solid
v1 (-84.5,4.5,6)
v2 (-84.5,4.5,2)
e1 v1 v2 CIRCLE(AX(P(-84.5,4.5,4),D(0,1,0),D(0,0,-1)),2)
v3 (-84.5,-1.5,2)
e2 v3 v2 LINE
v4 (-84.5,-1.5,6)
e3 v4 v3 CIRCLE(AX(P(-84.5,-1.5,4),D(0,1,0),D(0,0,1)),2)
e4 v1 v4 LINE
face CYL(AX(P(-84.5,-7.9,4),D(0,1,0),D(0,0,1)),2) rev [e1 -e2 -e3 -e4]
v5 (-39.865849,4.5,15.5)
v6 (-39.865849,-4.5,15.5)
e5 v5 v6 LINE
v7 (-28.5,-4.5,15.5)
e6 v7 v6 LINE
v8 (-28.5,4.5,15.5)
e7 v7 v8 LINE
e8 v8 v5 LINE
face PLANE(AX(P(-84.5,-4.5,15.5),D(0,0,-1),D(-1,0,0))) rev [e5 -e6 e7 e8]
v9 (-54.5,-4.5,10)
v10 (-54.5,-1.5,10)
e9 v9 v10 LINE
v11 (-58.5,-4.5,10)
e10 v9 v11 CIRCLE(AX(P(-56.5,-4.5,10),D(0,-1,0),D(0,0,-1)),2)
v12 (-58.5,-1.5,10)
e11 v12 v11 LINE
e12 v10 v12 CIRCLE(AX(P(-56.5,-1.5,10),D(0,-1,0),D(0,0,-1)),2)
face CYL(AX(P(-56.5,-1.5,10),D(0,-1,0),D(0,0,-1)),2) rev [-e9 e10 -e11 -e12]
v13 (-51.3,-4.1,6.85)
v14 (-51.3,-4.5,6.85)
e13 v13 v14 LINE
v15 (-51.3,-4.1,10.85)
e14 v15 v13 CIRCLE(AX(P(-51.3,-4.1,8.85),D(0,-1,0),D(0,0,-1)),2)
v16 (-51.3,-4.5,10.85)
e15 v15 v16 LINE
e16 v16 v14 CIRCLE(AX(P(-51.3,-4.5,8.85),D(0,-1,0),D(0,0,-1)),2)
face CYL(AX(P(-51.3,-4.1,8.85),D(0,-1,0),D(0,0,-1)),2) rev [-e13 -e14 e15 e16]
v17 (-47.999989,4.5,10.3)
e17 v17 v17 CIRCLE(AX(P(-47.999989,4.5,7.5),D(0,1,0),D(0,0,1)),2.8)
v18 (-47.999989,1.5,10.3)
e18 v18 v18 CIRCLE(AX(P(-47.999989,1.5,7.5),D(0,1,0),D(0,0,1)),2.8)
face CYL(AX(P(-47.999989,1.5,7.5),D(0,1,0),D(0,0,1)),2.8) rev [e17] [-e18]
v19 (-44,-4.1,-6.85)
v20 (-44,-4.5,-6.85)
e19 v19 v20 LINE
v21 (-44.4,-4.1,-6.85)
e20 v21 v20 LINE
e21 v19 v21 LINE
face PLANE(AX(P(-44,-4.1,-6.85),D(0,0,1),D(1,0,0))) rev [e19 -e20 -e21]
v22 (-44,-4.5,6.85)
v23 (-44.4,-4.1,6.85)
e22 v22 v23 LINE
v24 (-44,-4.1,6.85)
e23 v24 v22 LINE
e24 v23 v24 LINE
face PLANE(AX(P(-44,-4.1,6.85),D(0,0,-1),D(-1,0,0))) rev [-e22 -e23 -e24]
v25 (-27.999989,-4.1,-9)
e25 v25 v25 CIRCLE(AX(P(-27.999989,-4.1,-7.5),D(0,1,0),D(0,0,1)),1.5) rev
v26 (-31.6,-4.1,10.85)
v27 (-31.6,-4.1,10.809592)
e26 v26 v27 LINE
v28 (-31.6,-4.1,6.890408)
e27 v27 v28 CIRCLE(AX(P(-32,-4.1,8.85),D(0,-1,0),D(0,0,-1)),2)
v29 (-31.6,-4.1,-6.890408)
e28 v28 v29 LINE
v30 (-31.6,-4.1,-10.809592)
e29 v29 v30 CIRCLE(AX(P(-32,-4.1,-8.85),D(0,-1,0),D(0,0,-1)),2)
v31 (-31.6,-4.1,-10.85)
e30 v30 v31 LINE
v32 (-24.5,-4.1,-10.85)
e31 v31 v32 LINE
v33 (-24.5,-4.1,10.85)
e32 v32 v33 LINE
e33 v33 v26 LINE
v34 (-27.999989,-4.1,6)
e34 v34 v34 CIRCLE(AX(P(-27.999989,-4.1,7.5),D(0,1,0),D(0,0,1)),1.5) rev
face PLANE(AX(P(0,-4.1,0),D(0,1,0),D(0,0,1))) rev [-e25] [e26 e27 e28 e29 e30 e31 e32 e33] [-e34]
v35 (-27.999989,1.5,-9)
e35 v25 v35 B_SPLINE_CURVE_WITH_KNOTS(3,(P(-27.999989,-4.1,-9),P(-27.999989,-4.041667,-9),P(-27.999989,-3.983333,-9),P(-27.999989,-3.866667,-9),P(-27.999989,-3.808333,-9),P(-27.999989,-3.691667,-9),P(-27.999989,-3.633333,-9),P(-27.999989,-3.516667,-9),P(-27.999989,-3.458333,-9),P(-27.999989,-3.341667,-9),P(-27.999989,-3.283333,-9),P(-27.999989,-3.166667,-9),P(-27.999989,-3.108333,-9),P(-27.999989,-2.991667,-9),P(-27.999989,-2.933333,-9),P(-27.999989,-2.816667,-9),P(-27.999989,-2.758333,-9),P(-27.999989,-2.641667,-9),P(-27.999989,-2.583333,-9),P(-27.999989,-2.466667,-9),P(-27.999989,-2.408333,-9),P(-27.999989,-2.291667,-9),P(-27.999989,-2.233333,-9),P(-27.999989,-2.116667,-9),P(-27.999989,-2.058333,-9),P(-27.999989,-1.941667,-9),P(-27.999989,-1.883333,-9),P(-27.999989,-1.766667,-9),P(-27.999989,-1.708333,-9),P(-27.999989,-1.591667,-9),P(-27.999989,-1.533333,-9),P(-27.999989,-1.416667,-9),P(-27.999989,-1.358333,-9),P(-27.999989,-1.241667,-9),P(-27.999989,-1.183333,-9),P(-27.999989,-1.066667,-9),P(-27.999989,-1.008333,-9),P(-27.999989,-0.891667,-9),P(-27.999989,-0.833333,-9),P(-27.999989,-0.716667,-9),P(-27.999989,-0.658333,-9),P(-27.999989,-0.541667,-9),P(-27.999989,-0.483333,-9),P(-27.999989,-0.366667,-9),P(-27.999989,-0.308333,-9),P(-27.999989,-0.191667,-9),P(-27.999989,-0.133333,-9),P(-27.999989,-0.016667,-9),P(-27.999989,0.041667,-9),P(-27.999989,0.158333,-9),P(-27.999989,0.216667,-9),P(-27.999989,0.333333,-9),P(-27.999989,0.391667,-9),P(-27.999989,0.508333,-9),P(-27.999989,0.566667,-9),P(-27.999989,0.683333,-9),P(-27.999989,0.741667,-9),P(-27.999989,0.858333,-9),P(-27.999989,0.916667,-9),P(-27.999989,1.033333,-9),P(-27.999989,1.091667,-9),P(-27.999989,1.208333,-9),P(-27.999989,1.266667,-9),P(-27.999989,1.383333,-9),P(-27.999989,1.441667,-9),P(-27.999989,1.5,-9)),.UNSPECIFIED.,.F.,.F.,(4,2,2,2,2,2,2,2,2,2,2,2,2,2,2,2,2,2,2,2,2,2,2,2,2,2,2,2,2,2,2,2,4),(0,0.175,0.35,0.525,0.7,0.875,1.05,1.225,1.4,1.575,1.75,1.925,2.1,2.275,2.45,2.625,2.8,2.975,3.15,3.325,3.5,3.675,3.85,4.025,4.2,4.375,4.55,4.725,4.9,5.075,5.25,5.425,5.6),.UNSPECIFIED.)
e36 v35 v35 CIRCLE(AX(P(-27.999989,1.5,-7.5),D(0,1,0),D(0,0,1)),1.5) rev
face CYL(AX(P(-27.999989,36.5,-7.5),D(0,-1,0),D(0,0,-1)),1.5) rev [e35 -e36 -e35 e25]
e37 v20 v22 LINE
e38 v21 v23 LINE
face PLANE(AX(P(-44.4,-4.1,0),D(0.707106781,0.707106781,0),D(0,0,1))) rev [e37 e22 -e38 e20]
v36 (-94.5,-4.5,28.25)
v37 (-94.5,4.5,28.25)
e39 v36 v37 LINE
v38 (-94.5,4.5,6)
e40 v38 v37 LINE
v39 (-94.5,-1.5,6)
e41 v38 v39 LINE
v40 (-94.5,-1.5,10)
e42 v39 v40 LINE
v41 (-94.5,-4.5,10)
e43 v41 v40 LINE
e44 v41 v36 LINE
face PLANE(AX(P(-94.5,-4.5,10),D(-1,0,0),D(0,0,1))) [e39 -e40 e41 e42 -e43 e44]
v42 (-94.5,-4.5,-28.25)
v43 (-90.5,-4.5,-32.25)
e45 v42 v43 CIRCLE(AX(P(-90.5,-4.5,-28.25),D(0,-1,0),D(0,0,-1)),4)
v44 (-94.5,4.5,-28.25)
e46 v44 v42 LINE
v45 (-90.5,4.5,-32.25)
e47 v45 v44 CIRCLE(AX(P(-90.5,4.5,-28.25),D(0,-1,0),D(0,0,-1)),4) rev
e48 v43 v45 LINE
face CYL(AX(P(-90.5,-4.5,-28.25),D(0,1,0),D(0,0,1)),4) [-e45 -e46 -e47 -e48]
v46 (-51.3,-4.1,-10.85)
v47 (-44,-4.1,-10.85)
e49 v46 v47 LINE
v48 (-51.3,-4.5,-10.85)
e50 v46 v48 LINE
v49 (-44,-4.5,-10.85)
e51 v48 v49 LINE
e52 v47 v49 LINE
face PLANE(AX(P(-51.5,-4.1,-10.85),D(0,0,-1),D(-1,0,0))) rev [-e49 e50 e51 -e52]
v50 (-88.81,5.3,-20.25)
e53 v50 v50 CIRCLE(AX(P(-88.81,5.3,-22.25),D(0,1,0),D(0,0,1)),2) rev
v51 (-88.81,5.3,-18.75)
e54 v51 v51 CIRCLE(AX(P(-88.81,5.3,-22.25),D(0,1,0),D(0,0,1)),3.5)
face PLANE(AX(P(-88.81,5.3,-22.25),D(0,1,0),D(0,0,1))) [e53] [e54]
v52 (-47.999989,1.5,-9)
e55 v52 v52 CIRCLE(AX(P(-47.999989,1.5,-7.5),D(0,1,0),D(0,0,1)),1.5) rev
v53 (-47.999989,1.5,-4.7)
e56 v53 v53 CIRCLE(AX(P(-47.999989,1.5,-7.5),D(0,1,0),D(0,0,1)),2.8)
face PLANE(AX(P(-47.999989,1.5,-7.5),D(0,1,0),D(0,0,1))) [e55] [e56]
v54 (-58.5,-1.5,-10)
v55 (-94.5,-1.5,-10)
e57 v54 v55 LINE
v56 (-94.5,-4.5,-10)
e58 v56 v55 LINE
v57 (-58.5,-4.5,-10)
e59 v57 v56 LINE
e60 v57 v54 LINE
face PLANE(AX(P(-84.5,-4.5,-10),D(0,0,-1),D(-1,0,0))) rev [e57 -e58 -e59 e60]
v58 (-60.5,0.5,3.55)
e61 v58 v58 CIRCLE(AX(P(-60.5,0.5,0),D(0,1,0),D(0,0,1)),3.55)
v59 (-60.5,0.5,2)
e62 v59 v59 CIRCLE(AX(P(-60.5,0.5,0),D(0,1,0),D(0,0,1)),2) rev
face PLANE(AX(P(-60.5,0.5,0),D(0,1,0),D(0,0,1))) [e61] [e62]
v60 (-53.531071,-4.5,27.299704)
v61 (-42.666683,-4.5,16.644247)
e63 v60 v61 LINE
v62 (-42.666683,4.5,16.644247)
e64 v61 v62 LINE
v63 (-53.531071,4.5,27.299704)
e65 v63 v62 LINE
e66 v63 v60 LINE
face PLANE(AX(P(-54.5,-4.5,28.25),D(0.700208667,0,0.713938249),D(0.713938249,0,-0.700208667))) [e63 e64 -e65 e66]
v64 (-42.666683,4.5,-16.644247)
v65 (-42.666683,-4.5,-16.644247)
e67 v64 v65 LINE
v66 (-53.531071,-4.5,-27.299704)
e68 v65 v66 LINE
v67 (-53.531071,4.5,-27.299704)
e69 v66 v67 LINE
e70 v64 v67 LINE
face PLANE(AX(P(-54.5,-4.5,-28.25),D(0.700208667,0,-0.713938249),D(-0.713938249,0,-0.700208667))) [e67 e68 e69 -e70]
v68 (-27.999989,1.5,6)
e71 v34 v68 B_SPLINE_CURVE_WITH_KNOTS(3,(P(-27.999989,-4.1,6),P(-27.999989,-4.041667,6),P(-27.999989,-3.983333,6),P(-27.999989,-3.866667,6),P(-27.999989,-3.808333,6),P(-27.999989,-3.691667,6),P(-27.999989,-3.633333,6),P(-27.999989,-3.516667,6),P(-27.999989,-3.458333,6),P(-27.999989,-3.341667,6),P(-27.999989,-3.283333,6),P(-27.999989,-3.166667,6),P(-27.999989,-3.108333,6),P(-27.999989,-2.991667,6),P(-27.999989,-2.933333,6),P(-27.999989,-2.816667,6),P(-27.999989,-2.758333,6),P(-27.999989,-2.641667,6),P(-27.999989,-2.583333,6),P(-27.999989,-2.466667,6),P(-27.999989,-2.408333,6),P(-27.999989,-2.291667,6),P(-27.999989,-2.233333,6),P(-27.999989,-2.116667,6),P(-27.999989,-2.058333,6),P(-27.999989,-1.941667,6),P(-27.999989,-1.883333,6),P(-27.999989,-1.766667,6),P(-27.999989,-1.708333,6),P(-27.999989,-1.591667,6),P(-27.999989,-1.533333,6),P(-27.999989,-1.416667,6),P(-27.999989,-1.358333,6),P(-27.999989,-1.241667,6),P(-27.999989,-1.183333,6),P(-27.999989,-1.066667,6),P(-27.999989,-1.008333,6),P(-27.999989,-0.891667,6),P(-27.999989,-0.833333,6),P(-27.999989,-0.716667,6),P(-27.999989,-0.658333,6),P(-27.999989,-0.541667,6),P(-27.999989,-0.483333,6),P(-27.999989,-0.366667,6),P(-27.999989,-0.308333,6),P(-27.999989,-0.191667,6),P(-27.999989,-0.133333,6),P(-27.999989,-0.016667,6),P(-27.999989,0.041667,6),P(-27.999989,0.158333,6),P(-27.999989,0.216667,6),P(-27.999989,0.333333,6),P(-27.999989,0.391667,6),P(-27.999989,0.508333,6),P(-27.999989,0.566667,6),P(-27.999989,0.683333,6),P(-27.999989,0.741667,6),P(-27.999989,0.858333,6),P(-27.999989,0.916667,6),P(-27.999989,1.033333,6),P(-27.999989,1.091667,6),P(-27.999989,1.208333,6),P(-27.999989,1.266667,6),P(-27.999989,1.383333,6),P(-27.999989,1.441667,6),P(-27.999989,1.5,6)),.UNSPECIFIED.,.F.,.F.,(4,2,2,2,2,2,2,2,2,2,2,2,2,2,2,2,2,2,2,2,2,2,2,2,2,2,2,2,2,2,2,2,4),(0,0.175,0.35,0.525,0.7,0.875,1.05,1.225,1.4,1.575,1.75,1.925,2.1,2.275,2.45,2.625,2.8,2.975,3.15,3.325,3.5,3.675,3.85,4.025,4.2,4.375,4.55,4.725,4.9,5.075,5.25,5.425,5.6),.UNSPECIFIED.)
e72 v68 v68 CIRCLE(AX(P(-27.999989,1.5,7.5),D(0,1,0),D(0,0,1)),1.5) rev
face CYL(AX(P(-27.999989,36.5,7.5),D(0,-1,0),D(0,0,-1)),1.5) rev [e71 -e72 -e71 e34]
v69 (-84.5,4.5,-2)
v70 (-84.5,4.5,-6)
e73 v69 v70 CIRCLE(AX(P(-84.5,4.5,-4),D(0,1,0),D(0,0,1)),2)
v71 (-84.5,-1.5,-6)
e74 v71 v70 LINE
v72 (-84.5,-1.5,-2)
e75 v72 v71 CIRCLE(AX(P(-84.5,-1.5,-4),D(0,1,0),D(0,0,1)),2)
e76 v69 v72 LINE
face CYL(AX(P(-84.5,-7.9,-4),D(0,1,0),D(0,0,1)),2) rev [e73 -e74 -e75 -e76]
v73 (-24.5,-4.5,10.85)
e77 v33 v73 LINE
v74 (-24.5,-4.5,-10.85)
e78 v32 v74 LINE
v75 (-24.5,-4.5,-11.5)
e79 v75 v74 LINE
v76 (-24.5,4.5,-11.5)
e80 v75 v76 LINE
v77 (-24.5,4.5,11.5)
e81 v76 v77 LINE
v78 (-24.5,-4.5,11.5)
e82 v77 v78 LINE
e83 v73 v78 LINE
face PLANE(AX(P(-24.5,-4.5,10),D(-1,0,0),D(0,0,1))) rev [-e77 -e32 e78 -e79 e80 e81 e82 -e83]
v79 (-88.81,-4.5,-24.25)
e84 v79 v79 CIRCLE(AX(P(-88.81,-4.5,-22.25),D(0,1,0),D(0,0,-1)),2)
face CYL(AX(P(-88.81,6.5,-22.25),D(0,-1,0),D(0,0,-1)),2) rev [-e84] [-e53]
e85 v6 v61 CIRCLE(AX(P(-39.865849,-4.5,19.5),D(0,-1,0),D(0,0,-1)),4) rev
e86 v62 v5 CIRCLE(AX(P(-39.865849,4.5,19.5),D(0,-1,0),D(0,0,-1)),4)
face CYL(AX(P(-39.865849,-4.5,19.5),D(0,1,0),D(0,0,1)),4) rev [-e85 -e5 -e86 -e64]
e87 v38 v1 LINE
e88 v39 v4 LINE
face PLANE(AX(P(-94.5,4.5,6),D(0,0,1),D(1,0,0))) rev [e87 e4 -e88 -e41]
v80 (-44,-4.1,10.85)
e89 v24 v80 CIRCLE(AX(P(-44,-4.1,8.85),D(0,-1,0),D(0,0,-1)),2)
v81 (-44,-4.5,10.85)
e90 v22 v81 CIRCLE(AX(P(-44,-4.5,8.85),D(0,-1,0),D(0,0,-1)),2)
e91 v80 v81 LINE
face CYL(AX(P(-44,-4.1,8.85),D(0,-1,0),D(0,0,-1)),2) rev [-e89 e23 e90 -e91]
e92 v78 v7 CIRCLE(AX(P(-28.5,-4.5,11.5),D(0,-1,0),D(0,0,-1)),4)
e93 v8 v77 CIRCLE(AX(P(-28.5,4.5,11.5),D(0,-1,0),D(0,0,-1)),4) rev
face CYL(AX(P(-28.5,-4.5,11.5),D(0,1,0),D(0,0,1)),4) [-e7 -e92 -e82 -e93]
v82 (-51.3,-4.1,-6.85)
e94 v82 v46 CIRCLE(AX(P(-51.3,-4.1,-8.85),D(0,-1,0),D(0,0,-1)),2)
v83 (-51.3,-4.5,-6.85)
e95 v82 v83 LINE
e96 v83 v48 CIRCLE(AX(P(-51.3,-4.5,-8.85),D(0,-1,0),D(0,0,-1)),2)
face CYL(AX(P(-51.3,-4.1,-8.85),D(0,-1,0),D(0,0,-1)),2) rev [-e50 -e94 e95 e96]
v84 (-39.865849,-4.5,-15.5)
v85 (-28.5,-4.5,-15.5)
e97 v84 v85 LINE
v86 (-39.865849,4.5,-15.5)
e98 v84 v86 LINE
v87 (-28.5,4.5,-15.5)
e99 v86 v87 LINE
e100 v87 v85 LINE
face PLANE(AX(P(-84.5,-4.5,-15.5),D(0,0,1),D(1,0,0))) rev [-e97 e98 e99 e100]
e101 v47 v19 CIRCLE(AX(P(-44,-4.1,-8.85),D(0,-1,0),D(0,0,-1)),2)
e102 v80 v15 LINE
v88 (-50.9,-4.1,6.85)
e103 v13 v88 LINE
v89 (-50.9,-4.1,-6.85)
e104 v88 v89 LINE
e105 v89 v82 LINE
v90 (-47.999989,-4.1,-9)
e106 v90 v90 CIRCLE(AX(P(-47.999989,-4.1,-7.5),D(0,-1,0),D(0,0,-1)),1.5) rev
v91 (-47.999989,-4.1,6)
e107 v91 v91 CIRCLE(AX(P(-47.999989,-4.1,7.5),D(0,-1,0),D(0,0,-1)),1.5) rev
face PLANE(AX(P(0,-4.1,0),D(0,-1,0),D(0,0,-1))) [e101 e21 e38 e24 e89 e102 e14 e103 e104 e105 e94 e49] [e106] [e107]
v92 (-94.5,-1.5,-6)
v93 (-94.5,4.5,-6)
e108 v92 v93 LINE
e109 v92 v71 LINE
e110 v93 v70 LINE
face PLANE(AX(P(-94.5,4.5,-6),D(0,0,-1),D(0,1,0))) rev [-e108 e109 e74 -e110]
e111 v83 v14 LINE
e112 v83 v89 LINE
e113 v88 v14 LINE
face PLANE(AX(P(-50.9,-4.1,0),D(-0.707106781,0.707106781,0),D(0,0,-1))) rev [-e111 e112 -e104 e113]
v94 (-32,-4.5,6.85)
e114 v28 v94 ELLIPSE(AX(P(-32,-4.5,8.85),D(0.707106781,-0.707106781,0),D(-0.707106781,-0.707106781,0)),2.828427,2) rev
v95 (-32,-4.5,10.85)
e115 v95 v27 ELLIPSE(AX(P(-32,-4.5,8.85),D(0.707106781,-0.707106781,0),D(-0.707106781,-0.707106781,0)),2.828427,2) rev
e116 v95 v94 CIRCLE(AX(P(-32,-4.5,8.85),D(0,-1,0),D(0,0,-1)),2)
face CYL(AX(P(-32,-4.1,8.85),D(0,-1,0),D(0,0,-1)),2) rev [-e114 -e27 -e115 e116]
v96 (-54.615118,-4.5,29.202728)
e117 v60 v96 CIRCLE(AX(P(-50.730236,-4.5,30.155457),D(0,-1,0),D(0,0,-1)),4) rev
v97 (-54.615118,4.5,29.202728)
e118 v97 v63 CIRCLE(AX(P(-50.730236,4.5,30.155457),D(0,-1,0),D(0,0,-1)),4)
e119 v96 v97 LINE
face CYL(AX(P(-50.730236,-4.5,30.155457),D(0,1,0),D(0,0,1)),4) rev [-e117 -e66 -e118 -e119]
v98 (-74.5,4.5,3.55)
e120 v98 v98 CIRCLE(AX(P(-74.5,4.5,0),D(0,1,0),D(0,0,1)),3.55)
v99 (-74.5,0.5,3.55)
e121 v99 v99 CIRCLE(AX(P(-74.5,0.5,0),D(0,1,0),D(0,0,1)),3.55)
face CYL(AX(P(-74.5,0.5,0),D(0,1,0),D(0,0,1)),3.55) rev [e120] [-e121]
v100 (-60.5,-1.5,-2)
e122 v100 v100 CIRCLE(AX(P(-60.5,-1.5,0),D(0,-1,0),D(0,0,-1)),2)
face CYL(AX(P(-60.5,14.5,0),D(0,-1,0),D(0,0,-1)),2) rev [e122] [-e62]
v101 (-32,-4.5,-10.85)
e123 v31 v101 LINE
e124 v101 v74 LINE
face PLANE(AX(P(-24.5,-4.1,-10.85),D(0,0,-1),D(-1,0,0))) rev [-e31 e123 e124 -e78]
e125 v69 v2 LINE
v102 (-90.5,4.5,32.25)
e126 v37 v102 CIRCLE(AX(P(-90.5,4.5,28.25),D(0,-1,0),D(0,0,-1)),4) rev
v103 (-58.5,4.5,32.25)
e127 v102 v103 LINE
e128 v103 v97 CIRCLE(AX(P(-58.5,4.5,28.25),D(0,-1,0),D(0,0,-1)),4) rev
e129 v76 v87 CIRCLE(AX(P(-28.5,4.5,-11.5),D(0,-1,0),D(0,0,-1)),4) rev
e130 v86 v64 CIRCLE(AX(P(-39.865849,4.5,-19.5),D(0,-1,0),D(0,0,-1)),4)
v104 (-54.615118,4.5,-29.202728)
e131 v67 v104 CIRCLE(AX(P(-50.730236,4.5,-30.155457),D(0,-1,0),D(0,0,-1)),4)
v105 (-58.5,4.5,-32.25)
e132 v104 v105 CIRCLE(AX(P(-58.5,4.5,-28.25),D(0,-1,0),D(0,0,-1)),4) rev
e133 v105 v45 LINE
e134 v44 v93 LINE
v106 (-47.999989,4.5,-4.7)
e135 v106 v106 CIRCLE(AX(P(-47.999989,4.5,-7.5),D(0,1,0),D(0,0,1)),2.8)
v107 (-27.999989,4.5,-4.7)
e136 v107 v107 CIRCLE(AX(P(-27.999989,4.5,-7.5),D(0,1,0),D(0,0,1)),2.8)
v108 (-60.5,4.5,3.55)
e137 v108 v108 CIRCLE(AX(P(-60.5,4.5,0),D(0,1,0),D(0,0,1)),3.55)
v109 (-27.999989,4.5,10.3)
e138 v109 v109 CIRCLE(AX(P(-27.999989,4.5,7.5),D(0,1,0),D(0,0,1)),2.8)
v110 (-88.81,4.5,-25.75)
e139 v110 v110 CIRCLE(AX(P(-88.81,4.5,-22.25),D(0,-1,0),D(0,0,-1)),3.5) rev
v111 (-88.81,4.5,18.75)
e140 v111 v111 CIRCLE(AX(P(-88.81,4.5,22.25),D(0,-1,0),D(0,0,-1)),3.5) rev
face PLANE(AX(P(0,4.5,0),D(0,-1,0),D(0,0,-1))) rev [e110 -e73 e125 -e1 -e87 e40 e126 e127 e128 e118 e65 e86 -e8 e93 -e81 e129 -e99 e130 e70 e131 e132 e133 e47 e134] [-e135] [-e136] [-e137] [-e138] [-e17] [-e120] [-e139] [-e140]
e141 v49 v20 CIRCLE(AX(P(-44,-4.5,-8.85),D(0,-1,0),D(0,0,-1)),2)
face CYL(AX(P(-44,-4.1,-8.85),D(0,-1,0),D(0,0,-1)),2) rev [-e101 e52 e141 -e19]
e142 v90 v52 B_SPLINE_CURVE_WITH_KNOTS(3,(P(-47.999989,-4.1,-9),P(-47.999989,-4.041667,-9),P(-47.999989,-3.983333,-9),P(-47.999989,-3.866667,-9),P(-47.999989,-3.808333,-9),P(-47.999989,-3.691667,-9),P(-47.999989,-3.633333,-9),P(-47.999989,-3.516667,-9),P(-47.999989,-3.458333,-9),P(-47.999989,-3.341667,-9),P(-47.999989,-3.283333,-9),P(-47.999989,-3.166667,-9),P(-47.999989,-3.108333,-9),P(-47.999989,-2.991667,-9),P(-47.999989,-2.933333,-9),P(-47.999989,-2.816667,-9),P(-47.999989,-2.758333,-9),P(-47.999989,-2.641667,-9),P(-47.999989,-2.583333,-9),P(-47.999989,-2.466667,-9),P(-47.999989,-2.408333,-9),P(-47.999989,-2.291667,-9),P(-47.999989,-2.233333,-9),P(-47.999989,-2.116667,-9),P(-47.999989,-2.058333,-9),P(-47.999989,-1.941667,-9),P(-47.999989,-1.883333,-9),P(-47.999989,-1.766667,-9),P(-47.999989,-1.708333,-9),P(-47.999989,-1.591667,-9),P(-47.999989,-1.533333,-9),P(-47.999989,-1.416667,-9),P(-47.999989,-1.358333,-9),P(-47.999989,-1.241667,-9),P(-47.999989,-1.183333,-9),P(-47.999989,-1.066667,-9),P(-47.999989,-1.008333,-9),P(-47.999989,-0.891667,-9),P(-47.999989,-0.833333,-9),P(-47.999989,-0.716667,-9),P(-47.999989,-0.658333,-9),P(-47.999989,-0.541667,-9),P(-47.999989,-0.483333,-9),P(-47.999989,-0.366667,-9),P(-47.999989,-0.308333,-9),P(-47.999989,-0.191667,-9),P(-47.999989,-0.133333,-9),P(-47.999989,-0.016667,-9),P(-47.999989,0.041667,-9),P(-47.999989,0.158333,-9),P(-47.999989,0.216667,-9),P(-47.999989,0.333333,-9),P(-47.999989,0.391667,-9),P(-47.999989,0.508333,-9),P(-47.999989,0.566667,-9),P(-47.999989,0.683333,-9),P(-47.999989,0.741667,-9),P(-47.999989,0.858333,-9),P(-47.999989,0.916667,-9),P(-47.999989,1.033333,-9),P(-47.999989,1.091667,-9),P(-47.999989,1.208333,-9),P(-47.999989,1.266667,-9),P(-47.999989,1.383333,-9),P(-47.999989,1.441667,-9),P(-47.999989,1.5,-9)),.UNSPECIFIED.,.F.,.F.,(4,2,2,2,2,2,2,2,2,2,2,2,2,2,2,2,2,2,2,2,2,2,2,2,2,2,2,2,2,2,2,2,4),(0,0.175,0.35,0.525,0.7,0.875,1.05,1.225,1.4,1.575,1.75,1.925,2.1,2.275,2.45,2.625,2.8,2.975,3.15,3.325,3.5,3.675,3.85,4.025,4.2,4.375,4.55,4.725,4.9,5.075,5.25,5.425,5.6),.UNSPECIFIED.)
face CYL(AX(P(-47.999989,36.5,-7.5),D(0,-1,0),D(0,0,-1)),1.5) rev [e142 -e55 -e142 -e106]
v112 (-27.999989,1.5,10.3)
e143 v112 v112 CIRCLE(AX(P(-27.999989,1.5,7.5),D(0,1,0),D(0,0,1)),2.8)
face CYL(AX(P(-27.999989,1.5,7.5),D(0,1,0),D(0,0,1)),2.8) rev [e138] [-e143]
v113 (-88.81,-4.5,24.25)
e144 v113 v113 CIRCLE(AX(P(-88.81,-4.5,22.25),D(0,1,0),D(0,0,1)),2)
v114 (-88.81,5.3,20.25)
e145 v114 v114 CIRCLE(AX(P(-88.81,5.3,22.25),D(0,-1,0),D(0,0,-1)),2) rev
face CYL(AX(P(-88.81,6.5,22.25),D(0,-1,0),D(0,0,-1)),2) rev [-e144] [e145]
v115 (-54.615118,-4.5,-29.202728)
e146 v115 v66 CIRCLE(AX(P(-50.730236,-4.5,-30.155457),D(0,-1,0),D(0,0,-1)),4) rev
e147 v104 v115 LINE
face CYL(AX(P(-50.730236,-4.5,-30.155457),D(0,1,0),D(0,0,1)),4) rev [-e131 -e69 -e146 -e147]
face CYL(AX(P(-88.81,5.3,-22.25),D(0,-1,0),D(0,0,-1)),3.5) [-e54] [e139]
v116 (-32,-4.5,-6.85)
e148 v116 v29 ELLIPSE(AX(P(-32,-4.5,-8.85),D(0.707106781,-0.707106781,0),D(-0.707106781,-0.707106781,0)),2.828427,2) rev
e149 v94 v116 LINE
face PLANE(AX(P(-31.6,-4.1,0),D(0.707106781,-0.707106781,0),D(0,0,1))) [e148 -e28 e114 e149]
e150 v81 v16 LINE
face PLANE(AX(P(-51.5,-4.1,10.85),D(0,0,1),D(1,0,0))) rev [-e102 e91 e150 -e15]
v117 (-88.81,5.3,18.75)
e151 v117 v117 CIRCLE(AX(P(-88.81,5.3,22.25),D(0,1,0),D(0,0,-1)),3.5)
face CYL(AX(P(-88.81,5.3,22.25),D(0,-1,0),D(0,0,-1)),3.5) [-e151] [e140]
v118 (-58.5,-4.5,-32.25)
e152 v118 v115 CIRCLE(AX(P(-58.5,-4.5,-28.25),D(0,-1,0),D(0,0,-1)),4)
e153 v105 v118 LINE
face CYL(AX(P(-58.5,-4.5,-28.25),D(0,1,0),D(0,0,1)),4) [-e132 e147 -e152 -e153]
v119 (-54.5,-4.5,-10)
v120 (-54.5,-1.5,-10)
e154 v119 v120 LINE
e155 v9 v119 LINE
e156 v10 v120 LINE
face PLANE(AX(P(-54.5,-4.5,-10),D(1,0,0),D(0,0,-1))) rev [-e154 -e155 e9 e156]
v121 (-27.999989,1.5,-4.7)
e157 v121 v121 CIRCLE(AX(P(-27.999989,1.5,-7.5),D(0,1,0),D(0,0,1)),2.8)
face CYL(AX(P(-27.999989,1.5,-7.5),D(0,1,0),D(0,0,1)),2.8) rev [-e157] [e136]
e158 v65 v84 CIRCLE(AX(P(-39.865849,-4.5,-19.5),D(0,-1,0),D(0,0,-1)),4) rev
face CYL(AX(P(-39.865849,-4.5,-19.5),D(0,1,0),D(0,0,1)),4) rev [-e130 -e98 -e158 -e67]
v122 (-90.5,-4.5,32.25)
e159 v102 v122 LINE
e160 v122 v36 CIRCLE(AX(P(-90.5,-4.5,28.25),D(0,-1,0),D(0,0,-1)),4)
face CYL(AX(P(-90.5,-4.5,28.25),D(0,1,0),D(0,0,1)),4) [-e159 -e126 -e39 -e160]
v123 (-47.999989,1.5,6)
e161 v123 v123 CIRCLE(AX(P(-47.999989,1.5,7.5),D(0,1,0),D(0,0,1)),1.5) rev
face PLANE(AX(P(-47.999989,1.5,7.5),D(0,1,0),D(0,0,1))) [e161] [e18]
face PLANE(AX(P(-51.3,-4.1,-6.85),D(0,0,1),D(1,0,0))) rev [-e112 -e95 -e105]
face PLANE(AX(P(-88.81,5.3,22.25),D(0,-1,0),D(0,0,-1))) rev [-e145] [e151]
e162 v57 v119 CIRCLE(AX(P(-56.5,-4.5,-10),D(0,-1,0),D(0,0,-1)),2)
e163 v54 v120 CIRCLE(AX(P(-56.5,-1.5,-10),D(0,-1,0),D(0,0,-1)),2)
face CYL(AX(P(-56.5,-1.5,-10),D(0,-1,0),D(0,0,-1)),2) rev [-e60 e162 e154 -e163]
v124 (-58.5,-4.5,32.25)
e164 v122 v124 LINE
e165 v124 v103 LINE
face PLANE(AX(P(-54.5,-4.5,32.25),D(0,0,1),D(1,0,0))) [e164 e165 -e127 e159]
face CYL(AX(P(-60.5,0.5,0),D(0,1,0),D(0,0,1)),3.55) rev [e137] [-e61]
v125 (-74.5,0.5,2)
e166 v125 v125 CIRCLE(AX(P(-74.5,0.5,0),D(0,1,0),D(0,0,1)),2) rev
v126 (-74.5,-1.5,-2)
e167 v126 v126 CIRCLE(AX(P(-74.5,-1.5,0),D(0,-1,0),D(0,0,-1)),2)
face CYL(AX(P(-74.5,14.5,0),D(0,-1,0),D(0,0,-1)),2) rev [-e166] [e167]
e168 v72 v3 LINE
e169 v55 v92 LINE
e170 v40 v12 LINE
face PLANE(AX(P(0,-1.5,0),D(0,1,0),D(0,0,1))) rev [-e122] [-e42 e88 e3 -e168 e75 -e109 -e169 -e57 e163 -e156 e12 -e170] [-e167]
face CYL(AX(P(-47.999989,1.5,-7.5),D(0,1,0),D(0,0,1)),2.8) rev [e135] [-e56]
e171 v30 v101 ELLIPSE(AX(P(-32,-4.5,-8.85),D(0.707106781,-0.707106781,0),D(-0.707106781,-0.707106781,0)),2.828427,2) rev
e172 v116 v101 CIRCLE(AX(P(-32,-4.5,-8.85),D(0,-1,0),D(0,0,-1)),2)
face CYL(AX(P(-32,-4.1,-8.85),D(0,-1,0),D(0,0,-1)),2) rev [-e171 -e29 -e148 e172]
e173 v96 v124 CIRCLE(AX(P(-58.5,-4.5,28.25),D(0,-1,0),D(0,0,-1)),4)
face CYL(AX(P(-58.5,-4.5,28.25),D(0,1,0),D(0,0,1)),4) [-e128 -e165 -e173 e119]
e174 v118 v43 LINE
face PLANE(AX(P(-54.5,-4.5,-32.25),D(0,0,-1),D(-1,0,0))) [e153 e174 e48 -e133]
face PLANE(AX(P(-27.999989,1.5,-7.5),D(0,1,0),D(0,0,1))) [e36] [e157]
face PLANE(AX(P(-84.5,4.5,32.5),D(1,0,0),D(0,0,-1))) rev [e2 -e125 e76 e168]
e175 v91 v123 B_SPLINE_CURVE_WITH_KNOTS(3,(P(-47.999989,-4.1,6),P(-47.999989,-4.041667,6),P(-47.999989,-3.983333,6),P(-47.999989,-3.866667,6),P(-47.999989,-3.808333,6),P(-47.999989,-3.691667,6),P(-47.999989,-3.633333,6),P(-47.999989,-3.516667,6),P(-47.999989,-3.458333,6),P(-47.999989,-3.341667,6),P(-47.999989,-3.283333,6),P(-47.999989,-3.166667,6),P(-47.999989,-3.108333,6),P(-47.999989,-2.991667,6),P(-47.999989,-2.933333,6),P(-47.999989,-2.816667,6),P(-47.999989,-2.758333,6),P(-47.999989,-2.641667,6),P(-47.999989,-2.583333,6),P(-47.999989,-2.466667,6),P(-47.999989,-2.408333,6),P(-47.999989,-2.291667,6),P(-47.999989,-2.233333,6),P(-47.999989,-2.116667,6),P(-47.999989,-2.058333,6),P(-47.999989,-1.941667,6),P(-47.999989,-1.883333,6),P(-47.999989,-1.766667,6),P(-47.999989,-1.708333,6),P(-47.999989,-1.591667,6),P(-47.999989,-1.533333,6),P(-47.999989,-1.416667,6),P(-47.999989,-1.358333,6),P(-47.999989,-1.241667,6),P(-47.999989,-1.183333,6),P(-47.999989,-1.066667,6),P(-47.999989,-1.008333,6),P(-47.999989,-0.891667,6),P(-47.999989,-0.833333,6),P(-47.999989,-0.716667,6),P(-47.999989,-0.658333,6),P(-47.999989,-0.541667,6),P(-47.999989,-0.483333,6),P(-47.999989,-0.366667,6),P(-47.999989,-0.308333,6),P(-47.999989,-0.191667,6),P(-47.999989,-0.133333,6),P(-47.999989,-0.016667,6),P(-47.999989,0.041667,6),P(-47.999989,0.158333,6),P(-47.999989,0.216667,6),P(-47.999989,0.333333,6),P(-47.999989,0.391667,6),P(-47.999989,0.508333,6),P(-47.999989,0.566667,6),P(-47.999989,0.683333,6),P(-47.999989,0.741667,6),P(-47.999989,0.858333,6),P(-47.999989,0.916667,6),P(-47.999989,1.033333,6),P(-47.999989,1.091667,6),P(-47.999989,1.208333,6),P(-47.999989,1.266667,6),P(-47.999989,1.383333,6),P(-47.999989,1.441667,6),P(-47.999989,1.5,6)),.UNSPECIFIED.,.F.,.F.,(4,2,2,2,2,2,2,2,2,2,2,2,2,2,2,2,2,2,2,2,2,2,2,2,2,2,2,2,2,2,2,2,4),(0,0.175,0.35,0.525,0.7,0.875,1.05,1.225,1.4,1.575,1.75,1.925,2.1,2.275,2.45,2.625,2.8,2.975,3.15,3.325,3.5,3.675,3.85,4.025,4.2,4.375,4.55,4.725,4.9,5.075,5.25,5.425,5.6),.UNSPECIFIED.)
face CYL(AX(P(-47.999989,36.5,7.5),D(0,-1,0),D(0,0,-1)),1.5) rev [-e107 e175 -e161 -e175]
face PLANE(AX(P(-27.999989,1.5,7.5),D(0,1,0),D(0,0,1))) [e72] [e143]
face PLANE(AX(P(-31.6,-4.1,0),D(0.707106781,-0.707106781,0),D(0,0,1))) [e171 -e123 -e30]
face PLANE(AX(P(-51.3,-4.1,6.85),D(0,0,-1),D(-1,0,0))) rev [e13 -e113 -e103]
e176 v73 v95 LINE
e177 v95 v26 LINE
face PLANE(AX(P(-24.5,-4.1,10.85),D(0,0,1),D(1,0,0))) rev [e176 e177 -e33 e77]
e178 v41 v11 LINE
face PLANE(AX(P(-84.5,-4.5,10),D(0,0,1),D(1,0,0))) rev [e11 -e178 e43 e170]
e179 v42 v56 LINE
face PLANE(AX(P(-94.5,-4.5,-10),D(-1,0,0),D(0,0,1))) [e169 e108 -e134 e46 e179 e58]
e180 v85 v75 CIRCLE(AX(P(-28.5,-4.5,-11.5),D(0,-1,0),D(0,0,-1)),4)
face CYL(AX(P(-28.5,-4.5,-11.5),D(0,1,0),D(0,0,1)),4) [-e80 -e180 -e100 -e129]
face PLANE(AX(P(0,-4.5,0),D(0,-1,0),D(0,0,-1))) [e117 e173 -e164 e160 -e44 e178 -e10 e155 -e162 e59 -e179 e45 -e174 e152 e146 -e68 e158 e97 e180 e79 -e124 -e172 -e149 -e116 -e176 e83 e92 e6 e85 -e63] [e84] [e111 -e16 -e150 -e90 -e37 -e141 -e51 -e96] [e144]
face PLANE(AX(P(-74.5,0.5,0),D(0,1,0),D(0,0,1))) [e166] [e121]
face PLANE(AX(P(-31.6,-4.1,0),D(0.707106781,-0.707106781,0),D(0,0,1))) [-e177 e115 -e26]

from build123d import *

# Parameters (mm, degrees)
SKETCH1_R               = 12
BOSS_EXTRUDE1_DEPTH     = 4.5
SKETCH2_R               = 1.7
CUT_EXTRUDE1_DEPTH      = 91.980767198
FILLET1_R               = 4
CUT_EXTRUDE4_DEPTH      = 91.980767198
FILLET3_R               = 4
SKETCH6_R               = 1.5
CUT_EXTRUDE5_DEPTH      = 41
CUT_EXTRUDE6_START      = -6
SKETCH7_W               = 30
SKETCH7_H               = 20
CUT_EXTRUDE6_DEPTH      = 3
SKETCH8_W               = 60
SKETCH8_H               = 17
CUT_EXTRUDE8_DEPTH      = 9
FILLET6_R               = 4
SKETCH9_W               = 40
SKETCH9_H               = 22.25
BOSS_EXTRUDE3_DEPTH     = 9
FILLET7_R               = 4
SKETCH13_R              = 3.5
BOSS_EXTRUDE5_DEPTH     = 0.8
CUT_EXTRUDE9_DEPTH      = 2
CUT_EXTRUDE9_DEPTH_BACK = 9
SKETCH10_R              = 2
BOSS_EXTRUDE4_DEPTH     = 9
SKETCH14_R              = 2
CUT_EXTRUDE10_DEPTH     = 16
SKETCH15_W              = 7.5
SKETCH15_H              = 21.7
CUT_EXTRUDE11_DEPTH     = 0.4
CHAMFER2_SIZE           = 0.4
CHAMFER3_SIZE           = 0.6
SKETCH16_W              = 4
SKETCH16_H              = 6
BOSS_EXTRUDE6_DEPTH     = 10
SKETCH17_R              = 2
CUT_EXTRUDE12_DEPTH     = 12.4
SKETCH18_R              = 3.55
CUT_EXTRUDE13_DEPTH     = 4
SKETCH19_R              = 2.8
CUT_EXTRUDE14_DEPTH     = 3
SKETCH20_R              = 2
CUT_EXTRUDE15_DEPTH     = 0.4
FILLET8_R               = 4
SKETCH21_R              = 2
CUT_EXTRUDE16_DEPTH     = 3


# Some blends are built 0.0001 mm under size
with BuildPart() as part:
    # Sketch1 → Boss-Extrude1 (new, symmetric)
    with BuildSketch(Plane(origin=(0, 0, 0), x_dir=(1, 0, 0), z_dir=(0, 1, 0))):
        Polygon((21.5, 20), (21.5, -20), (-20.5, -32.5), (-84.5, -32.5), (-84.5, 32.5), (-20.5, 32.5), align=None)
        with Locations(Location((0, 0, 0), (0, 0, 270))):
            Circle(SKETCH1_R, mode=Mode.SUBTRACT)
    extrude(amount=BOSS_EXTRUDE1_DEPTH, both=True)

    # Sketch2 → Cut-Extrude1 (cut, through all)
    with BuildSketch(Plane(origin=(0, 4.5, 0), x_dir=(1, 0, 0), z_dir=(0, 1, 0))):
        with Locations(Location((15.5, 15.5, 0), (0, 0, 270))):
            Circle(SKETCH2_R)
        with Locations(Location((-15.5, 15.5, 0), (0, 0, 270))):
            Circle(SKETCH2_R)
        with Locations(Location((-15.5, -15.5, 0), (0, 0, 270))):
            Circle(SKETCH2_R)
        with Locations(Location((15.5, -15.5, 0), (0, 0, 270))):
            Circle(SKETCH2_R)
        with Locations(Location((-19.5, 27.5, 0), (0, 0, 270))):
            Circle(SKETCH2_R)
        with Locations(Location((-19.5, -27.5, 0), (0, 0, 270))):
            Circle(SKETCH2_R)
    extrude(amount=-CUT_EXTRUDE1_DEPTH, mode=Mode.SUBTRACT)

    # Fillet1
    fillet1_edges = [part.edges().sort_by_distance(p)[0] for p in [
        (-20.5, 0, 32.5),
        (-84.5, 0, 32.5),
        (-84.5, 0, -32.5),
        (-20.5, 0, -32.5),
        (21.5, 0, -20),
        (21.5, 0, 20),
    ]]
    fillet(fillet1_edges, radius=FILLET1_R)

    # Sketch5 → Cut-Extrude4 (cut, through all)
    with BuildSketch(Plane(origin=(0, 4.5, 0), x_dir=(1, 0, 0), z_dir=(0, 1, 0))):
        Polygon((-24.5, 32.5), (-24.5, 10), (-24.5, -10), (-24.5, -32.5), (26.912022907, -32.5), (26.912022907, 32.5), align=None)
    extrude(amount=-CUT_EXTRUDE4_DEPTH, mode=Mode.SUBTRACT)

    # Fillet3
    fillet3_edges = [part.edges().sort_by_distance(p)[0] for p in [
        (-24.5, 0, -32.5),
        (-24.5, 0, 32.5),
    ]]
    fillet(fillet3_edges, radius=FILLET3_R)

    # Sketch6 → Cut-Extrude5 (cut)
    with BuildSketch(Plane.XZ.offset(4.5)):
        with Locations(Location((-47.999989197, -7.5, 0), (0, 0, 270))):
            Circle(SKETCH6_R)
        with Locations(Location((-47.999989197, 7.5, 0), (0, 0, 270))):
            Circle(SKETCH6_R)
        with Locations(Location((-27.999989197, 7.5, 0), (0, 0, 270))):
            Circle(SKETCH6_R)
        with Locations(Location((-27.999989197, -7.5, 0), (0, 0, 270))):
            Circle(SKETCH6_R)
    extrude(amount=-CUT_EXTRUDE5_DEPTH, mode=Mode.SUBTRACT)

    # Sketch7 → Cut-Extrude6 (cut)
    with BuildSketch(Plane(origin=(0, 4.5, 0), x_dir=(1, 0, 0), z_dir=(0, 1, 0)).offset(CUT_EXTRUDE6_START)):
        with Locations((-69.5, 0)):
            Rectangle(SKETCH7_W, SKETCH7_H)
    extrude(amount=-CUT_EXTRUDE6_DEPTH, mode=Mode.SUBTRACT)

    # Sketch8 → Cut-Extrude8 (cut)
    with BuildSketch(Plane(origin=(0, 4.5, 0), x_dir=(1, 0, 0), z_dir=(0, 1, 0))):
        with Locations((-54.5, 24)):
            Rectangle(SKETCH8_W, SKETCH8_H)
        with Locations((-54.5, -24)):
            Rectangle(SKETCH8_W, SKETCH8_H)
    extrude(amount=-CUT_EXTRUDE8_DEPTH, mode=Mode.SUBTRACT)

    # Fillet6
    fillet6_edges = [part.edges().sort_by_distance(p)[0] for p in [
        (-24.5, 0, -15.5),
        (-24.5, 0, 15.5),
    ]]
    fillet(fillet6_edges, radius=FILLET6_R)

    # Sketch9 → Boss-Extrude3 (add)
    with BuildSketch(Plane(origin=(0, 4.5, 0), x_dir=(1, 0, 0), z_dir=(0, 1, 0))):
        with Locations((-74.5, 21.125)):
            Rectangle(SKETCH9_W, SKETCH9_H)
        with Locations((-74.5, -21.125)):
            Rectangle(SKETCH9_W, SKETCH9_H)
    extrude(amount=-BOSS_EXTRUDE3_DEPTH)

    # Fillet7
    fillet7_edges = [part.edges().sort_by_distance(p)[0] for p in [
        (-54.5, 0, -32.25),
        (-94.5, 0, -32.25),
        (-54.5, 0, 32.25),
        (-94.5, 0, 32.25),
    ]]
    fillet(fillet7_edges, radius=FILLET7_R)

    # Sketch13 → Boss-Extrude5 (add)
    with BuildSketch(Plane(origin=(0, 4.5, 0), x_dir=(1, 0, 0), z_dir=(0, 1, 0))):
        with Locations(Location((-88.81, 22.25, 0), (0, 0, 90))):
            Circle(SKETCH13_R)
        with Locations(Location((-88.81, -22.25, 0), (0, 0, 90))):
            Circle(SKETCH13_R)
    extrude(amount=BOSS_EXTRUDE5_DEPTH)

    # Sketch10 → Cut-Extrude9 (cut, two sides: drawn at the far end of the back side and taken through both)
    with BuildSketch(Plane(origin=(0, 4.5, 0), x_dir=(1, 0, 0), z_dir=(0, 1, 0)).offset(-CUT_EXTRUDE9_DEPTH_BACK)):
        with Locations(Location((-88.81, -22.25, 0), (0, 0, 90))):
            Circle(SKETCH10_R)
        with Locations(Location((-88.81, 22.25, 0), (0, 0, 90))):
            Circle(SKETCH10_R)
    extrude(amount=CUT_EXTRUDE9_DEPTH + CUT_EXTRUDE9_DEPTH_BACK, mode=Mode.SUBTRACT)

    # Sketch11 → Boss-Extrude4 (add)
    with BuildSketch(Plane(origin=(0, 4.5, 0), x_dir=(1, 0, 0), z_dir=(0, 1, 0))):
        Polygon((-54.5, 28.25), (-41.5, 15.5), (-54.5, 15.5), align=None)
        Polygon((-54.5, -28.25), (-41.5, -15.5), (-54.5, -15.5), align=None)
    extrude(amount=-BOSS_EXTRUDE4_DEPTH)

    # Sketch14 → Cut-Extrude10 (cut)
    with BuildSketch(Plane.XZ.offset(1.5)):
        with Locations(Location((-74.5, 0, 0), (0, 0, 270))):
            Circle(SKETCH14_R)
        with Locations(Location((-60.5, 0, 0), (0, 0, 270))):
            Circle(SKETCH14_R)
    extrude(amount=-CUT_EXTRUDE10_DEPTH, mode=Mode.SUBTRACT)

    # Sketch15 → Cut-Extrude11 (cut)
    with BuildSketch(Plane.XZ.offset(4.5)):
        with Locations((-28.25, 0)):
            Rectangle(SKETCH15_W, SKETCH15_H)
        with Locations((-47.75, 0)):
            Rectangle(SKETCH15_W, SKETCH15_H)
    extrude(amount=-CUT_EXTRUDE11_DEPTH, mode=Mode.SUBTRACT)

    # Chamfer2
    chamfer2_edges = [part.edges().sort_by_distance(p)[0] for p in [
        (-32, -4.1, 0),
        (-44, -4.1, 0),
    ]]
    chamfer(chamfer2_edges, length=CHAMFER2_SIZE - 0.0001)  # a hair under: the kernel refuses the full size

    # Chamfer3
    # the kernel refuses this chamfer: 0.6 mm, written as the material it adds along each edge
    with BuildSketch(Plane(origin=(-51.5, -4.1, -12.393009793), x_dir=(-0.027495876610584506, -0.9996219169112968, 0), z_dir=(0, 0, 1))) as chamfer3_piece_1_section:
        Polygon((CHAMFER3_SIZE * 0.999621916911, CHAMFER3_SIZE * 0.0274958766106), (-CHAMFER3_SIZE * 0.0274958766106, CHAMFER3_SIZE * 0.999621916911), (0, 0), align=None)
    chamfer3_piece_1 = extrude(amount=24.786019586, mode=Mode.PRIVATE)
    chamfer3_piece_1 = split(chamfer3_piece_1, bisect_by=Plane(origin=(-51.281581799, -4.5, -11.621504896), z_dir=(0, 1, 0)), keep=Keep.TOP, mode=Mode.PRIVATE)
    add(chamfer3_piece_1)

    # Sketch16 → Boss-Extrude6 (add)
    with BuildSketch(Plane.ZY.offset(84.5)):
        with Locations((-8, 1.5)):
            Rectangle(SKETCH16_W, SKETCH16_H)
        with Locations((8, 1.5)):
            Rectangle(SKETCH16_W, SKETCH16_H)
    extrude(amount=BOSS_EXTRUDE6_DEPTH)

    # Sketch17 → Cut-Extrude12 (cut)
    with BuildSketch(Plane(origin=(0, 4.5, 0), x_dir=(1, 0, 0), z_dir=(0, 1, 0))):
        with Locations((-84.5, 4)):
            Circle(SKETCH17_R)
        with Locations((-84.5, -4)):
            Circle(SKETCH17_R)
    extrude(amount=-CUT_EXTRUDE12_DEPTH, mode=Mode.SUBTRACT)

    # Sketch18 → Cut-Extrude13 (cut)
    with BuildSketch(Plane(origin=(0, 4.5, 0), x_dir=(1, 0, 0), z_dir=(0, 1, 0))):
        with Locations(Location((-74.5, 0, 0), (0, 0, 270))):
            Circle(SKETCH18_R)
        with Locations(Location((-60.5, 0, 0), (0, 0, 270))):
            Circle(SKETCH18_R)
    extrude(amount=-CUT_EXTRUDE13_DEPTH, mode=Mode.SUBTRACT)

    # Sketch19 → Cut-Extrude14 (cut)
    with BuildSketch(Plane(origin=(0, 4.5, 0), x_dir=(1, 0, 0), z_dir=(0, 1, 0))):
        with Locations(Location((-47.999989197, 7.5, 0), (0, 0, 270))):
            Circle(SKETCH19_R)
        with Locations(Location((-27.999989197, 7.5, 0), (0, 0, 270))):
            Circle(SKETCH19_R)
        with Locations(Location((-47.999989197, -7.5, 0), (0, 0, 270))):
            Circle(SKETCH19_R)
        with Locations(Location((-27.999989197, -7.5, 0), (0, 0, 270))):
            Circle(SKETCH19_R)
    extrude(amount=-CUT_EXTRUDE14_DEPTH, mode=Mode.SUBTRACT)

    # Sketch20 → Cut-Extrude15 (cut)
    with BuildSketch(Plane.XZ.offset(4.5)):
        with Locations((-32, 8.85)):
            Circle(SKETCH20_R)
        with Locations((-32, -8.85)):
            Circle(SKETCH20_R)
        with BuildLine():
            Line((-51.3, -6.85), (-50.9, -6.85))
            Line((-50.9, -6.85), (-50.9, -10.85))
            Line((-50.9, -10.85), (-51.3, -10.85))
            ThreePointArc((-51.3, -10.85), (-53.3, -8.85), (-51.3, -6.85))
        make_face()
        with BuildLine():
            Line((-44, -6.85), (-44.4, -6.85))
            Line((-44.4, -6.85), (-44.4, -10.85))
            Line((-44.4, -10.85), (-44, -10.85))
            ThreePointArc((-44, -10.85), (-42, -8.85), (-44, -6.85))
        make_face()
        with BuildLine():
            Line((-51.3, 6.85), (-50.9, 6.85))
            Line((-50.9, 6.85), (-50.9, 10.85))
            Line((-50.9, 10.85), (-51.3, 10.85))
            ThreePointArc((-51.3, 10.85), (-53.3, 8.85), (-51.3, 6.85))
        make_face()
        with BuildLine():
            Line((-44, 6.85), (-44.4, 6.85))
            Line((-44.4, 6.85), (-44.4, 10.85))
            Line((-44.4, 10.85), (-44, 10.85))
            ThreePointArc((-44, 10.85), (-42, 8.85), (-44, 6.85))
        make_face()
    extrude(amount=-CUT_EXTRUDE15_DEPTH, mode=Mode.SUBTRACT)

    # Fillet8
    fillet8_edges = [part.edges().sort_by_distance(p)[0] for p in [
        (-54.5, 0, -28.25),
        (-54.5, 0, 28.25),
        (-41.5, 0, -15.5),
        (-41.5, 0, 15.5),
    ]]
    fillet(fillet8_edges, radius=FILLET8_R)

    # Sketch21 → Cut-Extrude16 (cut)
    with BuildSketch(Plane.XZ.offset(4.5)):
        with Locations((-56.5, 10)):
            Circle(SKETCH21_R)
        with Locations((-56.5, -10)):
            Circle(SKETCH21_R)
    extrude(amount=-CUT_EXTRUDE16_DEPTH, mode=Mode.SUBTRACT)


solid = part.part
